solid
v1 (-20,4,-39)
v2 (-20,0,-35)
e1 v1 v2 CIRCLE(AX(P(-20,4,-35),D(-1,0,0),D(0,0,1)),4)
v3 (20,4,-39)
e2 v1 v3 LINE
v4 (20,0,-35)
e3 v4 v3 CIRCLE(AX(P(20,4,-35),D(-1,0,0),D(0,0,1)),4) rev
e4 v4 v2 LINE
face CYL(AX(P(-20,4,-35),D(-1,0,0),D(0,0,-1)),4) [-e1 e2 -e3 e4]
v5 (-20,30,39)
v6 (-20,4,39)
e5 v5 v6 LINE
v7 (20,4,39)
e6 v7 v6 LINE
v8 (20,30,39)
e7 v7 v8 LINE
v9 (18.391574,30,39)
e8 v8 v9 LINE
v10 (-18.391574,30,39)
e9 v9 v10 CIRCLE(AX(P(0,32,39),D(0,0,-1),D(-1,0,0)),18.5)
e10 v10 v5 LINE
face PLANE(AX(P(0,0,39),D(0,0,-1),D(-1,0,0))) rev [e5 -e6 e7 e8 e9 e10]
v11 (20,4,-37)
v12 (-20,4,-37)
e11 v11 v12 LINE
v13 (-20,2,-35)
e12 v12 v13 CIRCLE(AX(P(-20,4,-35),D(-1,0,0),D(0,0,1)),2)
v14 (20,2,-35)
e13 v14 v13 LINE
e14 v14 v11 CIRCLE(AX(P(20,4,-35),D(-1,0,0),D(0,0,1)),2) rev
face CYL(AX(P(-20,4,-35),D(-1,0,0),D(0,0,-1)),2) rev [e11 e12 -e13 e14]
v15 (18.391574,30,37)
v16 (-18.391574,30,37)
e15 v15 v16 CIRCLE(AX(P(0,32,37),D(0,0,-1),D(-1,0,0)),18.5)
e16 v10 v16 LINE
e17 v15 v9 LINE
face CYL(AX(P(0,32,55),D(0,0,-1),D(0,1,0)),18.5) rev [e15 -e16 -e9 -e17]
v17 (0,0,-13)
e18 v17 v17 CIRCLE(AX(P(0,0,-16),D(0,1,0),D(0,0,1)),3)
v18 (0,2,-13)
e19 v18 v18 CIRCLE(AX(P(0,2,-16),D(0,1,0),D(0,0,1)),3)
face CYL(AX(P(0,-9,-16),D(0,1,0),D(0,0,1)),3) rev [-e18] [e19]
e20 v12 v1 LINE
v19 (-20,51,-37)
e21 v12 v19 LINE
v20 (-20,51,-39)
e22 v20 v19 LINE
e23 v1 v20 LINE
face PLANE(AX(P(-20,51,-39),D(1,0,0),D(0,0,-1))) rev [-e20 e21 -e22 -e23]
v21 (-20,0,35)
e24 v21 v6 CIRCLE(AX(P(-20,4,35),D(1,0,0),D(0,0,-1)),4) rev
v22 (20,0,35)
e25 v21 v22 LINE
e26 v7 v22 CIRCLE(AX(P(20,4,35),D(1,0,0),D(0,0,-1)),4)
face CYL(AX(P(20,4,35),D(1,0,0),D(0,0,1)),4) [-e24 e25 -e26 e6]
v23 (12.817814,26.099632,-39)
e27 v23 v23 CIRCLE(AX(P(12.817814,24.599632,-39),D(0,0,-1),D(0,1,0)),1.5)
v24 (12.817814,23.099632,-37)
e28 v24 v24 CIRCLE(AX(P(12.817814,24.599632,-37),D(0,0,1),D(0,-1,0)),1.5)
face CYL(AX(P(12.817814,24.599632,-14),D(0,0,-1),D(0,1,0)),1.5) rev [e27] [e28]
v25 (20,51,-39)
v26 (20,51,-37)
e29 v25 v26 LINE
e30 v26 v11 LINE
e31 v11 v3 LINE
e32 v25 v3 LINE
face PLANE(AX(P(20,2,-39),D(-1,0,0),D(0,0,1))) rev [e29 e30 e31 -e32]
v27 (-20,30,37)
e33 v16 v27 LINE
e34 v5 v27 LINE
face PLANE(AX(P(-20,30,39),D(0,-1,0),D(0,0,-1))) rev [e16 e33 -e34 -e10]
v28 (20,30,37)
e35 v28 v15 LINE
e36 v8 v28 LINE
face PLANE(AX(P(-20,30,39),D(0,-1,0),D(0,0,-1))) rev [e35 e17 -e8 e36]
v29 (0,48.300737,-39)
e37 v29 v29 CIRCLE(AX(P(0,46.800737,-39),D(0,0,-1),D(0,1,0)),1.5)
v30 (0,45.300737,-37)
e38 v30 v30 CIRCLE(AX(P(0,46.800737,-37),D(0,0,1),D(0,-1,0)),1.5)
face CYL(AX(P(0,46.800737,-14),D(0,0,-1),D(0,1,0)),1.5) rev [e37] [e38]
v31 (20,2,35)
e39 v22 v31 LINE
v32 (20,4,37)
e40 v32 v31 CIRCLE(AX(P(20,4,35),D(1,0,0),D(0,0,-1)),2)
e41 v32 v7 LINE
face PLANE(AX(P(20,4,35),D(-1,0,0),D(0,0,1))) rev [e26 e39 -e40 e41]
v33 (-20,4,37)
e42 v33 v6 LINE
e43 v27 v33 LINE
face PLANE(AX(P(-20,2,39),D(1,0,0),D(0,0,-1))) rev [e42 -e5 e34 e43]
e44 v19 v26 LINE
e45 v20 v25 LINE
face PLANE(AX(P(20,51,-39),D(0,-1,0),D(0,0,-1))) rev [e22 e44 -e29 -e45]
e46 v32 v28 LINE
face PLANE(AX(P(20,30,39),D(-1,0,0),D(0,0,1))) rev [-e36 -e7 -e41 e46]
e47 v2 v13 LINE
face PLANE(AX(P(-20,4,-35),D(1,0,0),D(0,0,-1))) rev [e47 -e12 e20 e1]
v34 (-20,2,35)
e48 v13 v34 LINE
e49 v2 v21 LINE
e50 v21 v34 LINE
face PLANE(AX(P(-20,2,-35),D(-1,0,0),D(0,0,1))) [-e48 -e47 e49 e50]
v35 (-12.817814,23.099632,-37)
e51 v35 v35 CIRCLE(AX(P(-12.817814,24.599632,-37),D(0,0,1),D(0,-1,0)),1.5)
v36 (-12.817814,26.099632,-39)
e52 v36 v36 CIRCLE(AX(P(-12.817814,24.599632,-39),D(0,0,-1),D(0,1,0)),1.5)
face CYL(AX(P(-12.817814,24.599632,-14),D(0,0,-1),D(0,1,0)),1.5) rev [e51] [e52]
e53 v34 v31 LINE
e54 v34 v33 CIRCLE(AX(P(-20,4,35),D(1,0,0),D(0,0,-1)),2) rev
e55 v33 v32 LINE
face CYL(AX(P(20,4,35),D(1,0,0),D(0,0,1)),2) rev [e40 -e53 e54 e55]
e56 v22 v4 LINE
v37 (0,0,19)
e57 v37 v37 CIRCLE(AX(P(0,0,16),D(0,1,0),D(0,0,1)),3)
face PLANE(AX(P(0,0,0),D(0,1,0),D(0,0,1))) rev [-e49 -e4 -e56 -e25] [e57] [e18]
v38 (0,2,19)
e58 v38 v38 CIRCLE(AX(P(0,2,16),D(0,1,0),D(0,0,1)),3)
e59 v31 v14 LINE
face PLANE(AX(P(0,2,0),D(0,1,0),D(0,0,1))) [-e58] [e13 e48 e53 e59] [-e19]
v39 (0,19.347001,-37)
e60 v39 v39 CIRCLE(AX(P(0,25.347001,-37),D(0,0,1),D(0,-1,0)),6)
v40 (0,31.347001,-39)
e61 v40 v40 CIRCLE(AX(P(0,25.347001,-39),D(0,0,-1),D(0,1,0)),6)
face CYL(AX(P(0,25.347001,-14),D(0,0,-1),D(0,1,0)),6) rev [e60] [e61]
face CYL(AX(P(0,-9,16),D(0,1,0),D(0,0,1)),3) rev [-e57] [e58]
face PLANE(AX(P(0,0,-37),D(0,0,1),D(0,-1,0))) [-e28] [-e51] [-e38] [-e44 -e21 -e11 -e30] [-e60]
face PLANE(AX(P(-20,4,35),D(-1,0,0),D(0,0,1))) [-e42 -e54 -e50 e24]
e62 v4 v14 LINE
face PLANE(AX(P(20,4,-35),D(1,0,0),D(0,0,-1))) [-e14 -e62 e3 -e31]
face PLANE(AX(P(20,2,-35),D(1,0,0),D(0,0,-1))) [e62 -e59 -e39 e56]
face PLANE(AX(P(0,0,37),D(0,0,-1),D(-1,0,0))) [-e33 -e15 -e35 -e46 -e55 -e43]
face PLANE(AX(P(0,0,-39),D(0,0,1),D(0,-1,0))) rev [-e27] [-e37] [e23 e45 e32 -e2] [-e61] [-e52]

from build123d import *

# Parameters (mm, degrees)
SKETCH44_W          = 40
SKETCH44_H          = 70
BOSS_EXTRUDE1_DEPTH = 2
EDGE_FLANGE6_DEPTH  = 40
SKETCH52_R          = 6
SKETCH52_R_2        = 1.5
CUT_EXTRUDE5_DEPTH  = 25
SKETCH54_R          = 3
CUT_EXTRUDE6_DEPTH  = 11
EDGE_FLANGE7_DEPTH  = 40
CUT_EXTRUDE8_START  = -10
SKETCH52_4_R        = 18.5
CUT_EXTRUDE8_DEPTH  = 84


# Sheet-metal steps are written as plain solids
with BuildPart() as part:
    # Sketch44 → Boss-Extrude1 (new body)
    with BuildSketch(Plane(origin=(0, 0, 0), x_dir=(1, 0, 0), z_dir=(0, 1, 0))):
        Rectangle(SKETCH44_W, SKETCH44_H)
    extrude(amount=BOSS_EXTRUDE1_DEPTH)

    # Edge-Flange6 section (across the edge) → Edge-Flange6 (add)
    with BuildSketch(Plane(origin=(20, 2, -37), x_dir=(0, 0, 1), z_dir=(-1, 0, 0))):
        with BuildLine():
            Line((-2, 2), (-2, 49))
            Line((-2, 49), (0, 49))
            Line((0, 49), (0, 2))
            ThreePointArc((0, 2), (0.585786438, 0.585786438), (2, 0))
            Line((2, 0), (2, -2))
            ThreePointArc((2, -2), (-0.828427125, -0.828427125), (-2, 2))
        make_face()
    extrude(amount=EDGE_FLANGE6_DEPTH)

    # Sketch52 → Cut-Extrude5 (cut)
    with BuildSketch(Plane(origin=(0, 0, -39), x_dir=(-1, 0, 0), z_dir=(0, 0, -1))):
        with Locations(Location((0, 25.347000811, 0), (0, 0, 90))):
            Circle(SKETCH52_R)
        with Locations(Location((0, 46.800736891, 0), (0, 0, 90))):
            Circle(SKETCH52_R_2)
        with Locations(Location((-12.817814142, 24.599631554, 0), (0, 0, 90))):
            Circle(SKETCH52_R_2)
        with Locations(Location((12.817814142, 24.599631554, 0), (0, 0, 90))):
            Circle(SKETCH52_R_2)
    extrude(amount=-CUT_EXTRUDE5_DEPTH, mode=Mode.SUBTRACT)

    # Sketch54 → Cut-Extrude6 (cut)
    with BuildSketch(Plane(origin=(0, 2, 0), x_dir=(1, 0, 0), z_dir=(0, 1, 0))):
        with Locations(Location((0, 16, 0), (0, 0, 270))):
            Circle(SKETCH54_R)
        with Locations(Location((0, -16, 0), (0, 0, 270))):
            Circle(SKETCH54_R)
    extrude(amount=-CUT_EXTRUDE6_DEPTH, mode=Mode.SUBTRACT)

    # Edge-Flange7 section (across the edge) → Edge-Flange7 (add)
    with BuildSketch(Plane(origin=(-20, 2, 37), x_dir=(0, 0, -1), z_dir=(1, 0, 0))):
        with BuildLine():
            Line((-2, 2), (-2, 28))
            Line((-2, 28), (0, 28))
            Line((0, 28), (0, 2))
            ThreePointArc((0, 2), (0.585786438, 0.585786438), (2, 0))
            Line((2, 0), (2, -2))
            ThreePointArc((2, -2), (-0.828427125, -0.828427125), (-2, 2))
        make_face()
    extrude(amount=EDGE_FLANGE7_DEPTH)

    # Sketch52<4> → Cut-Extrude8 (cut)
    with BuildSketch(Plane(origin=(0, 0, -39), x_dir=(-1, 0, 0), z_dir=(0, 0, -1)).offset(CUT_EXTRUDE8_START)):
        with Locations((0, 32)):
            Circle(SKETCH52_4_R)
    extrude(amount=-CUT_EXTRUDE8_DEPTH, mode=Mode.SUBTRACT)


solid = part.part
